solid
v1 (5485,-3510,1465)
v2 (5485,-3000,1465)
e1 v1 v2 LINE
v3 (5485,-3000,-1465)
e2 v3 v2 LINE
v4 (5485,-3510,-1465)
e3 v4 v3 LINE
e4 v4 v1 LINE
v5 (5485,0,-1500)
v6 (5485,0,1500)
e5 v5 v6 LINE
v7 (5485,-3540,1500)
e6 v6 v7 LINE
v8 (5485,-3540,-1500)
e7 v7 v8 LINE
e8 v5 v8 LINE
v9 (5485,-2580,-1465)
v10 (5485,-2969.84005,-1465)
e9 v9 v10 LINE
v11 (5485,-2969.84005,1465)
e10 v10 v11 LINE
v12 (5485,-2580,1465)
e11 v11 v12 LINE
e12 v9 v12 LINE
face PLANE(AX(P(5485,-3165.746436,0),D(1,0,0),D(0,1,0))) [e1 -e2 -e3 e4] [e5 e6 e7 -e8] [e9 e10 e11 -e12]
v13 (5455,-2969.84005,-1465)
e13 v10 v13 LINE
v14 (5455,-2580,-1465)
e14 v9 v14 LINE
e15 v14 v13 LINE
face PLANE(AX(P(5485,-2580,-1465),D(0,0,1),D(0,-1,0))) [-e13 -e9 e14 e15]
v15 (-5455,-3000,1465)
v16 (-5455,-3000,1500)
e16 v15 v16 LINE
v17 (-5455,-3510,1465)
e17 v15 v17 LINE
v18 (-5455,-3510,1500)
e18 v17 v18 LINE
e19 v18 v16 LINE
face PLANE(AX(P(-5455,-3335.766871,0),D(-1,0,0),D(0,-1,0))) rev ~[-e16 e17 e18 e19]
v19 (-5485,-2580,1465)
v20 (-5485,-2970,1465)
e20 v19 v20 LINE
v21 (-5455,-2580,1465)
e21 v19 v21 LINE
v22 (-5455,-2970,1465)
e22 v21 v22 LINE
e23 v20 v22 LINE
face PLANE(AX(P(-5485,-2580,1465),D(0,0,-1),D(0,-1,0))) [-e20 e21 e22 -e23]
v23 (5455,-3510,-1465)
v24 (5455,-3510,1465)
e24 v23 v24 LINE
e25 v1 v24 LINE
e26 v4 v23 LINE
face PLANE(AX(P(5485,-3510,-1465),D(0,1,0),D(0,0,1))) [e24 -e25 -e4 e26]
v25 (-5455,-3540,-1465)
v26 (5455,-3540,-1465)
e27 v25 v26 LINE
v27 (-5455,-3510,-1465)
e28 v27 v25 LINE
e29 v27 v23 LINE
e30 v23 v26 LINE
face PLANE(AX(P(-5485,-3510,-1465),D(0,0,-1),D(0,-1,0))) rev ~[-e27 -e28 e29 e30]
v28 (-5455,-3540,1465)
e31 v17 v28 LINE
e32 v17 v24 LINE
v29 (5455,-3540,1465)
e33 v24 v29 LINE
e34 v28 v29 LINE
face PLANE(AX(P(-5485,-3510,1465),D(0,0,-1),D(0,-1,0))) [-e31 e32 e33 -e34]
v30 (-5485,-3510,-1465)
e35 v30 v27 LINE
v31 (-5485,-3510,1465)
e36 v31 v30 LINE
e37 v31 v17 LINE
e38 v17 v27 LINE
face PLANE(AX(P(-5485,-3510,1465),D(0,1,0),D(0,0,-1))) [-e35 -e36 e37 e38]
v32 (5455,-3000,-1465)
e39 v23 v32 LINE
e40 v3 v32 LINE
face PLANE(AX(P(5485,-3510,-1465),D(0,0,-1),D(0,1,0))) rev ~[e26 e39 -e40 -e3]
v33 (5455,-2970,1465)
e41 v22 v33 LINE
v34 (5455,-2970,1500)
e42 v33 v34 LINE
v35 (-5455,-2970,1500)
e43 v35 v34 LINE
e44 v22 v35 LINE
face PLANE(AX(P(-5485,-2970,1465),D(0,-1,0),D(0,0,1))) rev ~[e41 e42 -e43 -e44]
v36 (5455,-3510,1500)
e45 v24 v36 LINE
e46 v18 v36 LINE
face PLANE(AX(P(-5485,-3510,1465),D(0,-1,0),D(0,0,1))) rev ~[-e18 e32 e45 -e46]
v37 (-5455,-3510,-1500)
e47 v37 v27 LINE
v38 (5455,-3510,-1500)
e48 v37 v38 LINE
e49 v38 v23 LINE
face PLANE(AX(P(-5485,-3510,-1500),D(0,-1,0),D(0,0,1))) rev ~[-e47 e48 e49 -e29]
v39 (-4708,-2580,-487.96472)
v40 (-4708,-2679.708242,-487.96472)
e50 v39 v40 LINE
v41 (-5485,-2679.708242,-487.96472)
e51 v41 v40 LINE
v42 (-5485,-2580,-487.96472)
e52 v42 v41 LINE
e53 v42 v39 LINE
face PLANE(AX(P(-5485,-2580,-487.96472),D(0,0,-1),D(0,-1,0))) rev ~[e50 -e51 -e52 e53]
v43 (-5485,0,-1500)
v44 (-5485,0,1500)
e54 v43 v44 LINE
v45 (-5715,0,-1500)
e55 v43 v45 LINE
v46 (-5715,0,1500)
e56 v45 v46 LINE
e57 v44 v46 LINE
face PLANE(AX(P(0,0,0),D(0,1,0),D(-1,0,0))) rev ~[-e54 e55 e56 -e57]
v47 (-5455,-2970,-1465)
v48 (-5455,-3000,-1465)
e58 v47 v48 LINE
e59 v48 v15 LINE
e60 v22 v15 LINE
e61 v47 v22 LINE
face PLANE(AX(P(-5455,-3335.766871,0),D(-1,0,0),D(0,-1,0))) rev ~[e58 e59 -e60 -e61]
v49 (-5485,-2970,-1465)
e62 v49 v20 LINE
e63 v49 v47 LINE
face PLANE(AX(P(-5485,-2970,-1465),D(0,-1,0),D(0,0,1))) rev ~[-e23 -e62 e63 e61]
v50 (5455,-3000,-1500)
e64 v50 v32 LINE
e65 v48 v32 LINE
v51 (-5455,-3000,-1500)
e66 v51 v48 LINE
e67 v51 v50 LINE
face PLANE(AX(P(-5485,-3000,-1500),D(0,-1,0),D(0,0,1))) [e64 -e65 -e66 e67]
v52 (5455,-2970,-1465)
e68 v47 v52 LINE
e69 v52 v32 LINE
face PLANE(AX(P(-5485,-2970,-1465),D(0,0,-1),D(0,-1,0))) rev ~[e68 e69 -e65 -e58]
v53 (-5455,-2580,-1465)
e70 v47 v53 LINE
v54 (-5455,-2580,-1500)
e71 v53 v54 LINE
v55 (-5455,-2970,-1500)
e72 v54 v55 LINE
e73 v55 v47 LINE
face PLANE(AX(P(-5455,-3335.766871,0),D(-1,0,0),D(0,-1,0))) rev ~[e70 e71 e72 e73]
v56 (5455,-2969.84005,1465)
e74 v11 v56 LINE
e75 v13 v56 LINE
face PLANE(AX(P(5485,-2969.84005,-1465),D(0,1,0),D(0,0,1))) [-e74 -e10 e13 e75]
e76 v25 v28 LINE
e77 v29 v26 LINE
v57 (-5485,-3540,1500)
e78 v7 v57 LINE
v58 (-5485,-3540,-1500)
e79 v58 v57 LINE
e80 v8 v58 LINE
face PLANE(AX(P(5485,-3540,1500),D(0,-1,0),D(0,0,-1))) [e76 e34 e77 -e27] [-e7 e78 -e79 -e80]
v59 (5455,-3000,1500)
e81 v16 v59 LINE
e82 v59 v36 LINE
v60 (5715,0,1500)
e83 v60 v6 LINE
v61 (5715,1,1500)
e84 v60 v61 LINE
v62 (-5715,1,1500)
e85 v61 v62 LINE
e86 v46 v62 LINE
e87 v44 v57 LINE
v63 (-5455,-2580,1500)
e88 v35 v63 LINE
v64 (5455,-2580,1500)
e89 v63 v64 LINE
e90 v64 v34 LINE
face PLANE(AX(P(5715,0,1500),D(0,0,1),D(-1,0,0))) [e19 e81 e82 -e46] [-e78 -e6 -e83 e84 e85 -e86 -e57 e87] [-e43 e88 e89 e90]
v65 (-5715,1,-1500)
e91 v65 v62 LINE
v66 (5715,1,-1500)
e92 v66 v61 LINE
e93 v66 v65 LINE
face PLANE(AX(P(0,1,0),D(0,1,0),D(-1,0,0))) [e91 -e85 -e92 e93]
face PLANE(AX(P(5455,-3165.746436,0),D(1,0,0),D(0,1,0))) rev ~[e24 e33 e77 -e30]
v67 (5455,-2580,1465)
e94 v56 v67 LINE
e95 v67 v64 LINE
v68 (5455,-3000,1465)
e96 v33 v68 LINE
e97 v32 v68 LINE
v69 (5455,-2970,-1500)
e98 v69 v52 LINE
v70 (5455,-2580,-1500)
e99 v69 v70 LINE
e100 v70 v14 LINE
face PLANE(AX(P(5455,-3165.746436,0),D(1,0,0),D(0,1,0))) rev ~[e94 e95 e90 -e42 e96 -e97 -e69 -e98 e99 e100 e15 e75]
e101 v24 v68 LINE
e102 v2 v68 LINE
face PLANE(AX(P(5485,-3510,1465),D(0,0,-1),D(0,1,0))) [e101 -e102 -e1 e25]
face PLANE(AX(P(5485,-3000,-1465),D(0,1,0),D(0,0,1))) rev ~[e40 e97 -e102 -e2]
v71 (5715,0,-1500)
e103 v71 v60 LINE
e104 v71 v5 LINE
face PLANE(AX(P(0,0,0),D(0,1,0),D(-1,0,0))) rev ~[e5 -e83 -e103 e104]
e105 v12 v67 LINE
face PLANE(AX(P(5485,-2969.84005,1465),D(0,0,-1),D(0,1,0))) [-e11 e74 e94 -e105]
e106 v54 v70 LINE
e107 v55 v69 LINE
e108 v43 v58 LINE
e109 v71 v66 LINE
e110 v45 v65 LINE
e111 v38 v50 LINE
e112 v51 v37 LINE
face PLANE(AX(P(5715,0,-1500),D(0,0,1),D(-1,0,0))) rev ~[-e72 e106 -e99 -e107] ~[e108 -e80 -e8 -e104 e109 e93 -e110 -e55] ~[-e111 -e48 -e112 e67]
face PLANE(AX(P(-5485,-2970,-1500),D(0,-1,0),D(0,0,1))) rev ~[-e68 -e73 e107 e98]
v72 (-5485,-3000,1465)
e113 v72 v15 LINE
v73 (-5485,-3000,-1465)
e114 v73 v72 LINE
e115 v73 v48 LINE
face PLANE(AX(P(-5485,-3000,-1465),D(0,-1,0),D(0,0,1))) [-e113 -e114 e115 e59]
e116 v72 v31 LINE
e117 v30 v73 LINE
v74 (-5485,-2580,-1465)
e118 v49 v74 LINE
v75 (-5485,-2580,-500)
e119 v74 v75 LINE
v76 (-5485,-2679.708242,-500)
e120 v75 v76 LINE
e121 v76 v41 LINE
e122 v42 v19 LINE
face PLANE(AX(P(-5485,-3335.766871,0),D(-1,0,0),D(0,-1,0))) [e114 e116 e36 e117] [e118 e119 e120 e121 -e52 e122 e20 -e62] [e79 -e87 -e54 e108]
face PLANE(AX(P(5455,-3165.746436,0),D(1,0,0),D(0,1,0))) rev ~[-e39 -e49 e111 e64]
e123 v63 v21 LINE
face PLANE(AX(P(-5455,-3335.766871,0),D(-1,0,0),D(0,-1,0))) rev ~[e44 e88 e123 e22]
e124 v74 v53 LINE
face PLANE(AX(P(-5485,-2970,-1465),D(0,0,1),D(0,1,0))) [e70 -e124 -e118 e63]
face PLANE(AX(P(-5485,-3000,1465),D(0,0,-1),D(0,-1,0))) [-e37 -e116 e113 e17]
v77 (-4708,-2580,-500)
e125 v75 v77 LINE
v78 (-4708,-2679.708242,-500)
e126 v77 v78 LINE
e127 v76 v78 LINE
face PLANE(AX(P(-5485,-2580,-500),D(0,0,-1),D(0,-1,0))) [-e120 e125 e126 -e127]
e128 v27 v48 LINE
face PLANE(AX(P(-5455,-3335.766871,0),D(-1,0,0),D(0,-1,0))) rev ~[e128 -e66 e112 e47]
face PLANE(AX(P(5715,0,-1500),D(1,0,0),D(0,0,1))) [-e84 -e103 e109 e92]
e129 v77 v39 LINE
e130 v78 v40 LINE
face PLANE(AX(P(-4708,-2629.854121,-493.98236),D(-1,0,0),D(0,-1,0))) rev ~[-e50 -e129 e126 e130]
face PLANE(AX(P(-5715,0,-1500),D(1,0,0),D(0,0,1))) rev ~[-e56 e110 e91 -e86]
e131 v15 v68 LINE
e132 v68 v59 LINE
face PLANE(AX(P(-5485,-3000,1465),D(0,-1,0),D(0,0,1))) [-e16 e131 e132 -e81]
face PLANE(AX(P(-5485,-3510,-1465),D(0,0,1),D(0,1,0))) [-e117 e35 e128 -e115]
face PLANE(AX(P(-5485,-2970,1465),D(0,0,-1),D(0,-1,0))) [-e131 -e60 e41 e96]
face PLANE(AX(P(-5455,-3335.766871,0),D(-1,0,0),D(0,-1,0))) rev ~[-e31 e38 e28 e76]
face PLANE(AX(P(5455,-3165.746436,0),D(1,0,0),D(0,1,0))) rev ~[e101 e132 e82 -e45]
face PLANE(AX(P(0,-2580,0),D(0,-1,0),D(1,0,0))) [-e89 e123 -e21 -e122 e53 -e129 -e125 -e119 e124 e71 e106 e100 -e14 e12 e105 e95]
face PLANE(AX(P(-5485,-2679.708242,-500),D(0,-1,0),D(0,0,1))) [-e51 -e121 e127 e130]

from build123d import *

# Parameters (mm, degrees)
F0_W      = 10970
F0_H      = 3000
F1_DEPTH  = 2580
F2_W      = 30
F2_H      = 2930
F3_DEPTH  = 30
F4_W      = 30
F4_H      = 35
F5_DEPTH  = 10940
F6_W      = 510
F6_H      = 2930
F7_DEPTH  = 30
F8_W      = 11430
F8_H      = 3000
F9_DEPTH  = 1
F2_W_2    = 99.7082424164
F2_H_2    = 12.0352804661
F10_DEPTH = 777


# Not quite as in the source:
# - a feature names something its author has since deleted; it is built from what else it names


with BuildPart() as f1:
    # F0 (on Front) → F1 (new body)
    with BuildSketch(Plane.XZ):
        Rectangle(F0_W, F0_H)
    extrude(amount=F1_DEPTH)

    # F2 (on face) → F3 (join)
    with BuildSketch(Plane(origin=(-5485, 0, 0), x_dir=(0, -1, 0), z_dir=(-1, 0, 0))):
        Polygon((3540, 1500), (2580, 1500), (2580, 1465), (2970, 1465), (3000, 1465), (3510, 1465), (3510, -1465), (3000, -1465), (2970, -1465), (2580, -1465), (2580, -1500), (3540, -1500), (3540, -1465), (3540, 1465), align=None)
        with Locations((2985, 0)):
            Rectangle(F2_W, F2_H)
    extrude(amount=-F3_DEPTH)

    # F4 (on face) → F5 (join)
    with BuildSketch(Plane(origin=(-5485, 0, 0), x_dir=(0, -1, 0), z_dir=(-1, 0, 0))):
        with Locations((2985, 1482.5)):
            Rectangle(F4_W, F4_H)
        with Locations((2985, -1482.5)):
            Rectangle(F4_W, F4_H)
        with Locations((3525, -1482.5)):
            Rectangle(F4_W, F4_H)
        with Locations((3525, 1482.5)):
            Rectangle(F4_W, F4_H)
    extrude(amount=-F5_DEPTH)

    # F6 (on face) → F7 (join)
    with BuildSketch(Plane.YZ.offset(5485)):
        Polygon((-3540, -1500), (-2580, -1500), (-2580, -1465), (-2969.8400497437, -1465), (-2969.8400497437, 1465), (-2580, 1465), (-2580, 1500), (-3540, 1500), (-3540, 1465), (-3540, -1465), align=None)
        with Locations((-3255, 0)):
            Rectangle(F6_W, F6_H, mode=Mode.SUBTRACT)
    extrude(amount=-F7_DEPTH)

    # F8 (on face) → F9 (join)
    with BuildSketch(Plane(origin=(0, 0, 0), x_dir=(-1, 0, 0), z_dir=(0, 1, 0))):
        Rectangle(F8_W, F8_H)
    extrude(amount=F9_DEPTH)

    # F2 (on face) → F10 (join)
    with BuildSketch(Plane(origin=(-5485, 0, 0), x_dir=(0, -1, 0), z_dir=(-1, 0, 0))):
        with Locations((2629.8541212082, -493.982359767)):
            Rectangle(F2_W_2, F2_H_2)
    extrude(amount=-F10_DEPTH)


solid = f1.part
